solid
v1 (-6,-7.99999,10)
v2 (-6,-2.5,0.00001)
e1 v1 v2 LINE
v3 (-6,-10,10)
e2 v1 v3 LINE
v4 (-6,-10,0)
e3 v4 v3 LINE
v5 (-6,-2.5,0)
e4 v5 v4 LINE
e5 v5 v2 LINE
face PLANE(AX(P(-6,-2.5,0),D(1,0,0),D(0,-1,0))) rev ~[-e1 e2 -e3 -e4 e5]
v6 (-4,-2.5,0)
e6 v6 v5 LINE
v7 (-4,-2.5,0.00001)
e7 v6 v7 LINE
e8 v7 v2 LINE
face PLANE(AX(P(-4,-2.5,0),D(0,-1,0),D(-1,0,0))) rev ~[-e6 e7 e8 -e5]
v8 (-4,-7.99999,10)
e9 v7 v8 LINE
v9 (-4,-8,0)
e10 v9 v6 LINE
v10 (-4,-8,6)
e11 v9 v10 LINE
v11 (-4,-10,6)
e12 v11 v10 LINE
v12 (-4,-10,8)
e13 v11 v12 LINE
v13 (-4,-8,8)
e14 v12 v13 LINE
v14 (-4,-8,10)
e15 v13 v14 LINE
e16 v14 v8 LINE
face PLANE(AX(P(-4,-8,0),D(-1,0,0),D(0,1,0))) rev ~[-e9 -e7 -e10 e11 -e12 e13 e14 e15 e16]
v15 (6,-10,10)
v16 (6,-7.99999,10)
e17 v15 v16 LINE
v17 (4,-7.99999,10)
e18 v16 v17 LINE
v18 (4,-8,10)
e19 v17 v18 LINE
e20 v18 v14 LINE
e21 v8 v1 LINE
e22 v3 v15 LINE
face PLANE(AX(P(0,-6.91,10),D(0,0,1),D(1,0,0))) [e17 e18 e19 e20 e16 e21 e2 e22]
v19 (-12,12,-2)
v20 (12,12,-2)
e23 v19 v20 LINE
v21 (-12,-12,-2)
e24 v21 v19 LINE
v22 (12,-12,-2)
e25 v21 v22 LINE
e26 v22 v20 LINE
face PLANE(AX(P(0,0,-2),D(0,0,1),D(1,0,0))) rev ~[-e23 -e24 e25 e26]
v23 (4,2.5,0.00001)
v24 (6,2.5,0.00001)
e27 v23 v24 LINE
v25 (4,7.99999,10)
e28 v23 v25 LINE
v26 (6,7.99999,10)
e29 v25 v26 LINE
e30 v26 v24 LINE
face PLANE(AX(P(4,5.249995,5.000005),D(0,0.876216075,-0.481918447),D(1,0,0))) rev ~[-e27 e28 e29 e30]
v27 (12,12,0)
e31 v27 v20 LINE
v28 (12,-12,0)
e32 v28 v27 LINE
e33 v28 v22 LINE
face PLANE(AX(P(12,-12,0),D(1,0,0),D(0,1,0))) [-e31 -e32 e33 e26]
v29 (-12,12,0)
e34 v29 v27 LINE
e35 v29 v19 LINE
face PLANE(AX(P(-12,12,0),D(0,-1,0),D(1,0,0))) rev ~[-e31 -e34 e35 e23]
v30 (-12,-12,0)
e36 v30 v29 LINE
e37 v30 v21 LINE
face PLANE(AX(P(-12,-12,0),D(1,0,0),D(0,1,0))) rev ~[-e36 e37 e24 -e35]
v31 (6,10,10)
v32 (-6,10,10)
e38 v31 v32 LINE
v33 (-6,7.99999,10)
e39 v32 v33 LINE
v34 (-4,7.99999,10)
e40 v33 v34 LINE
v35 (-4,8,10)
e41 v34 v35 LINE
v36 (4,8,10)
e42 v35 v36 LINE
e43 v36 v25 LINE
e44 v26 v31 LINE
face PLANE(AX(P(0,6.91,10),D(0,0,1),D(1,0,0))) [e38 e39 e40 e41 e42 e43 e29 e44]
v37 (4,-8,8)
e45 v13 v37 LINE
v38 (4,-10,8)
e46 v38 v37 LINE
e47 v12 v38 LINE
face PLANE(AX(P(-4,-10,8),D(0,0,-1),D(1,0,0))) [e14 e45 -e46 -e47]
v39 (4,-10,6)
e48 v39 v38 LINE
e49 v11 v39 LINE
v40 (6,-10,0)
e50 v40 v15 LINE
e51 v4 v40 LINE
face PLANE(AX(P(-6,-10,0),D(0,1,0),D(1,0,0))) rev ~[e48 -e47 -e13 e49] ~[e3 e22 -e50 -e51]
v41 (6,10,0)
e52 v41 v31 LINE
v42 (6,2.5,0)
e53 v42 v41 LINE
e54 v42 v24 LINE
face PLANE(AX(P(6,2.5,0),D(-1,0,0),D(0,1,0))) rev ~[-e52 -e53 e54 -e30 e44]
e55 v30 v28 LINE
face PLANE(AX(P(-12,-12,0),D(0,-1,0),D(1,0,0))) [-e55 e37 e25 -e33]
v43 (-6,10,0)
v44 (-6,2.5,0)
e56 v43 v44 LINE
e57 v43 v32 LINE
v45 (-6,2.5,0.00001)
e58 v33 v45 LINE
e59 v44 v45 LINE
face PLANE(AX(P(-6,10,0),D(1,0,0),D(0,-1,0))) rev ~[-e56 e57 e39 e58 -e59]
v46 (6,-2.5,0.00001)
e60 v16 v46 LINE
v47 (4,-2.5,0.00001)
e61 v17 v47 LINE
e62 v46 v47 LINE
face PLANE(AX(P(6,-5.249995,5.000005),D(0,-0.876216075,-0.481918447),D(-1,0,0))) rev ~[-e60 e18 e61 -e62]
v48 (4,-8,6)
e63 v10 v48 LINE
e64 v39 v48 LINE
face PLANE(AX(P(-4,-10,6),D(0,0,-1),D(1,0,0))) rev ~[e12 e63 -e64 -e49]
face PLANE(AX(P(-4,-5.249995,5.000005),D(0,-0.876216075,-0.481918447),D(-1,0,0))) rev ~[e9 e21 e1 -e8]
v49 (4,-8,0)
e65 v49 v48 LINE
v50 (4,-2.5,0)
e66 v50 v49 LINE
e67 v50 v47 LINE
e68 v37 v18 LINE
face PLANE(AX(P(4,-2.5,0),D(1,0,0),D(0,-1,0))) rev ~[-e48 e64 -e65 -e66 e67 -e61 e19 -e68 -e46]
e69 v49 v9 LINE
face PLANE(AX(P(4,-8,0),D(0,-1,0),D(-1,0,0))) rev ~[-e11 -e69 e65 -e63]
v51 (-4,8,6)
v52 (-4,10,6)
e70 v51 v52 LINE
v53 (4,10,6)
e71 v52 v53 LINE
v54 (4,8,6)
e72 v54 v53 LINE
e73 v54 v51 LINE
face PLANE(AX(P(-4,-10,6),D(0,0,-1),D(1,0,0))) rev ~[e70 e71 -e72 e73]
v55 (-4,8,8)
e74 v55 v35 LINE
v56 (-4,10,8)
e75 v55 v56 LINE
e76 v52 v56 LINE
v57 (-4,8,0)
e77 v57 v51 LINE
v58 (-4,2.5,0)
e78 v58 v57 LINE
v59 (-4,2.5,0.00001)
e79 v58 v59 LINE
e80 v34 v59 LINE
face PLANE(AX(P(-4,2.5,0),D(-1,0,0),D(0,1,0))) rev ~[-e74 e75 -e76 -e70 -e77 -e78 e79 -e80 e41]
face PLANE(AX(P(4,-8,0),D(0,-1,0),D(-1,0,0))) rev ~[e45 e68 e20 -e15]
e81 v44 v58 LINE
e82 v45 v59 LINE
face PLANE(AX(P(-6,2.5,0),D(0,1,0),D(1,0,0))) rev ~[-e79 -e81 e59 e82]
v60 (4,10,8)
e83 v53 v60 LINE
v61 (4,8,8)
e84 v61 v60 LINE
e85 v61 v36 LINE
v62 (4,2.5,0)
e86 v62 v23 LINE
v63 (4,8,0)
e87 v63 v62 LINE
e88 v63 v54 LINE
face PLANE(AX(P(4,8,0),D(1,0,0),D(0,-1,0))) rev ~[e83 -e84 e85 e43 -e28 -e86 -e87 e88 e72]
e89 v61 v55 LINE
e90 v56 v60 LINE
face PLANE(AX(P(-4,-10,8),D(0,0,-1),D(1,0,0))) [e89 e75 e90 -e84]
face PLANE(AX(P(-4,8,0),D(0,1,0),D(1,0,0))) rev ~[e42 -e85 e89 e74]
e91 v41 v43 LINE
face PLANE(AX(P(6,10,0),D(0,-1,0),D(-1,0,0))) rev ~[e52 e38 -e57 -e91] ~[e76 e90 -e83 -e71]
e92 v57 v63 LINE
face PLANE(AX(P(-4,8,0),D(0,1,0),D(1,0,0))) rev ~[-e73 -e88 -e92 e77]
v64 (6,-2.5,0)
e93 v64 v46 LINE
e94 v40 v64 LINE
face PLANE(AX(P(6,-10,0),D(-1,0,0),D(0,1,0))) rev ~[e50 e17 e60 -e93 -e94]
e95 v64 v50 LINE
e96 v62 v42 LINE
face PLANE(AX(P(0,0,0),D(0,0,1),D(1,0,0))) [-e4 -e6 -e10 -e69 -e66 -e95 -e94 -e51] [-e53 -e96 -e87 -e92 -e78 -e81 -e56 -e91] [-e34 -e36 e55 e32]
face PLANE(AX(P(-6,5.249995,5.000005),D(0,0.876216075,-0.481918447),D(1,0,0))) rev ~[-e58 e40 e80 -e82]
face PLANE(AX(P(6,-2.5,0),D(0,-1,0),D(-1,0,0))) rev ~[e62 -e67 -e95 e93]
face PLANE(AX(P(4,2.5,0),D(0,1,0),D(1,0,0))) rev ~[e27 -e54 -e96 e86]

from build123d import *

# Parameters (mm, degrees)
F0_W     = 24
F0_H     = 24
F1_DEPTH = 2
F2_DEPTH = 10
F3_SIZE2 = 9.99999
F3_SIZE  = 5.49999
F4_SIZE2 = 9.99999
F4_SIZE  = 5.49999
F5_W     = 8
F5_H     = 2
F6_DEPTH = 25


# Not quite as in the source:
# - a fillet or chamfer is up to 0.001 mm smaller than in the source, because OpenCascade refuses the exact size


with BuildPart() as f1:
    # F0 (on Top) → F1 (new body)
    with BuildSketch(Plane.XY):
        Rectangle(F0_W, F0_H)
        Polygon((-6, -10), (-6, -2.5), (-4, -2.5), (-4, -8), (0, -8), (4, -8), (4, -2.5), (6, -2.5), (6, -10), (0, -10), align=None, mode=Mode.SUBTRACT)
        Polygon((-4, 2.5), (-6, 2.5), (-6, 10), (0, 10), (6, 10), (6, 2.5), (4, 2.5), (4, 8), (0, 8), (-4, 8), align=None, mode=Mode.SUBTRACT)
        Polygon((-6, 10), (-6, 2.5), (-4, 2.5), (-4, 8), (0, 8), (4, 8), (4, 2.5), (6, 2.5), (6, 10), (0, 10), align=None)
        Polygon((-4, -2.5), (-6, -2.5), (-6, -10), (0, -10), (6, -10), (6, -2.5), (4, -2.5), (4, -8), (0, -8), (-4, -8), align=None)
    extrude(amount=-F1_DEPTH)

    # F0 (on Top) → F2 (join)
    with BuildSketch(Plane.XY):
        Polygon((-6, 10), (-6, 2.5), (-4, 2.5), (-4, 8), (0, 8), (4, 8), (4, 2.5), (6, 2.5), (6, 10), (0, 10), align=None)
        Polygon((-4, -2.5), (-6, -2.5), (-6, -10), (0, -10), (6, -10), (6, -2.5), (4, -2.5), (4, -8), (0, -8), (-4, -8), align=None)
    extrude(amount=F2_DEPTH)

    # F3 (size 5.5 and 10 in the source; OpenCascade refuses exactly that, so slightly less here)
    f3_edges = [f1.edges().sort_by_distance(p)[0] for p in [
        (-5, 2.5, 10),
        (5, 2.5, 10),
    ]]
    f3_side = f1.faces().sort_by_distance((-5.85849, 6.25, 10))[0]
    chamfer(f3_edges, length=F3_SIZE, length2=F3_SIZE2, reference=f3_side)

    # F4 (size 5.5 and 10 in the source; OpenCascade refuses exactly that, so slightly less here)
    f4_edges = [f1.edges().sort_by_distance(p)[0] for p in [
        (5, -2.5, 10),
        (-5, -2.5, 10),
    ]]
    f4_side = f1.faces().sort_by_distance((-5, -2.64151, 10))[0]
    chamfer(f4_edges, length=F4_SIZE, length2=F4_SIZE2, reference=f4_side)

    # F5 (on face) → F6 (cut)
    with BuildSketch(Plane.XZ.offset(10)):
        with Locations((0, 7)):
            Rectangle(F5_W, F5_H)
    extrude(amount=-F6_DEPTH, mode=Mode.SUBTRACT)


solid = f1.part
